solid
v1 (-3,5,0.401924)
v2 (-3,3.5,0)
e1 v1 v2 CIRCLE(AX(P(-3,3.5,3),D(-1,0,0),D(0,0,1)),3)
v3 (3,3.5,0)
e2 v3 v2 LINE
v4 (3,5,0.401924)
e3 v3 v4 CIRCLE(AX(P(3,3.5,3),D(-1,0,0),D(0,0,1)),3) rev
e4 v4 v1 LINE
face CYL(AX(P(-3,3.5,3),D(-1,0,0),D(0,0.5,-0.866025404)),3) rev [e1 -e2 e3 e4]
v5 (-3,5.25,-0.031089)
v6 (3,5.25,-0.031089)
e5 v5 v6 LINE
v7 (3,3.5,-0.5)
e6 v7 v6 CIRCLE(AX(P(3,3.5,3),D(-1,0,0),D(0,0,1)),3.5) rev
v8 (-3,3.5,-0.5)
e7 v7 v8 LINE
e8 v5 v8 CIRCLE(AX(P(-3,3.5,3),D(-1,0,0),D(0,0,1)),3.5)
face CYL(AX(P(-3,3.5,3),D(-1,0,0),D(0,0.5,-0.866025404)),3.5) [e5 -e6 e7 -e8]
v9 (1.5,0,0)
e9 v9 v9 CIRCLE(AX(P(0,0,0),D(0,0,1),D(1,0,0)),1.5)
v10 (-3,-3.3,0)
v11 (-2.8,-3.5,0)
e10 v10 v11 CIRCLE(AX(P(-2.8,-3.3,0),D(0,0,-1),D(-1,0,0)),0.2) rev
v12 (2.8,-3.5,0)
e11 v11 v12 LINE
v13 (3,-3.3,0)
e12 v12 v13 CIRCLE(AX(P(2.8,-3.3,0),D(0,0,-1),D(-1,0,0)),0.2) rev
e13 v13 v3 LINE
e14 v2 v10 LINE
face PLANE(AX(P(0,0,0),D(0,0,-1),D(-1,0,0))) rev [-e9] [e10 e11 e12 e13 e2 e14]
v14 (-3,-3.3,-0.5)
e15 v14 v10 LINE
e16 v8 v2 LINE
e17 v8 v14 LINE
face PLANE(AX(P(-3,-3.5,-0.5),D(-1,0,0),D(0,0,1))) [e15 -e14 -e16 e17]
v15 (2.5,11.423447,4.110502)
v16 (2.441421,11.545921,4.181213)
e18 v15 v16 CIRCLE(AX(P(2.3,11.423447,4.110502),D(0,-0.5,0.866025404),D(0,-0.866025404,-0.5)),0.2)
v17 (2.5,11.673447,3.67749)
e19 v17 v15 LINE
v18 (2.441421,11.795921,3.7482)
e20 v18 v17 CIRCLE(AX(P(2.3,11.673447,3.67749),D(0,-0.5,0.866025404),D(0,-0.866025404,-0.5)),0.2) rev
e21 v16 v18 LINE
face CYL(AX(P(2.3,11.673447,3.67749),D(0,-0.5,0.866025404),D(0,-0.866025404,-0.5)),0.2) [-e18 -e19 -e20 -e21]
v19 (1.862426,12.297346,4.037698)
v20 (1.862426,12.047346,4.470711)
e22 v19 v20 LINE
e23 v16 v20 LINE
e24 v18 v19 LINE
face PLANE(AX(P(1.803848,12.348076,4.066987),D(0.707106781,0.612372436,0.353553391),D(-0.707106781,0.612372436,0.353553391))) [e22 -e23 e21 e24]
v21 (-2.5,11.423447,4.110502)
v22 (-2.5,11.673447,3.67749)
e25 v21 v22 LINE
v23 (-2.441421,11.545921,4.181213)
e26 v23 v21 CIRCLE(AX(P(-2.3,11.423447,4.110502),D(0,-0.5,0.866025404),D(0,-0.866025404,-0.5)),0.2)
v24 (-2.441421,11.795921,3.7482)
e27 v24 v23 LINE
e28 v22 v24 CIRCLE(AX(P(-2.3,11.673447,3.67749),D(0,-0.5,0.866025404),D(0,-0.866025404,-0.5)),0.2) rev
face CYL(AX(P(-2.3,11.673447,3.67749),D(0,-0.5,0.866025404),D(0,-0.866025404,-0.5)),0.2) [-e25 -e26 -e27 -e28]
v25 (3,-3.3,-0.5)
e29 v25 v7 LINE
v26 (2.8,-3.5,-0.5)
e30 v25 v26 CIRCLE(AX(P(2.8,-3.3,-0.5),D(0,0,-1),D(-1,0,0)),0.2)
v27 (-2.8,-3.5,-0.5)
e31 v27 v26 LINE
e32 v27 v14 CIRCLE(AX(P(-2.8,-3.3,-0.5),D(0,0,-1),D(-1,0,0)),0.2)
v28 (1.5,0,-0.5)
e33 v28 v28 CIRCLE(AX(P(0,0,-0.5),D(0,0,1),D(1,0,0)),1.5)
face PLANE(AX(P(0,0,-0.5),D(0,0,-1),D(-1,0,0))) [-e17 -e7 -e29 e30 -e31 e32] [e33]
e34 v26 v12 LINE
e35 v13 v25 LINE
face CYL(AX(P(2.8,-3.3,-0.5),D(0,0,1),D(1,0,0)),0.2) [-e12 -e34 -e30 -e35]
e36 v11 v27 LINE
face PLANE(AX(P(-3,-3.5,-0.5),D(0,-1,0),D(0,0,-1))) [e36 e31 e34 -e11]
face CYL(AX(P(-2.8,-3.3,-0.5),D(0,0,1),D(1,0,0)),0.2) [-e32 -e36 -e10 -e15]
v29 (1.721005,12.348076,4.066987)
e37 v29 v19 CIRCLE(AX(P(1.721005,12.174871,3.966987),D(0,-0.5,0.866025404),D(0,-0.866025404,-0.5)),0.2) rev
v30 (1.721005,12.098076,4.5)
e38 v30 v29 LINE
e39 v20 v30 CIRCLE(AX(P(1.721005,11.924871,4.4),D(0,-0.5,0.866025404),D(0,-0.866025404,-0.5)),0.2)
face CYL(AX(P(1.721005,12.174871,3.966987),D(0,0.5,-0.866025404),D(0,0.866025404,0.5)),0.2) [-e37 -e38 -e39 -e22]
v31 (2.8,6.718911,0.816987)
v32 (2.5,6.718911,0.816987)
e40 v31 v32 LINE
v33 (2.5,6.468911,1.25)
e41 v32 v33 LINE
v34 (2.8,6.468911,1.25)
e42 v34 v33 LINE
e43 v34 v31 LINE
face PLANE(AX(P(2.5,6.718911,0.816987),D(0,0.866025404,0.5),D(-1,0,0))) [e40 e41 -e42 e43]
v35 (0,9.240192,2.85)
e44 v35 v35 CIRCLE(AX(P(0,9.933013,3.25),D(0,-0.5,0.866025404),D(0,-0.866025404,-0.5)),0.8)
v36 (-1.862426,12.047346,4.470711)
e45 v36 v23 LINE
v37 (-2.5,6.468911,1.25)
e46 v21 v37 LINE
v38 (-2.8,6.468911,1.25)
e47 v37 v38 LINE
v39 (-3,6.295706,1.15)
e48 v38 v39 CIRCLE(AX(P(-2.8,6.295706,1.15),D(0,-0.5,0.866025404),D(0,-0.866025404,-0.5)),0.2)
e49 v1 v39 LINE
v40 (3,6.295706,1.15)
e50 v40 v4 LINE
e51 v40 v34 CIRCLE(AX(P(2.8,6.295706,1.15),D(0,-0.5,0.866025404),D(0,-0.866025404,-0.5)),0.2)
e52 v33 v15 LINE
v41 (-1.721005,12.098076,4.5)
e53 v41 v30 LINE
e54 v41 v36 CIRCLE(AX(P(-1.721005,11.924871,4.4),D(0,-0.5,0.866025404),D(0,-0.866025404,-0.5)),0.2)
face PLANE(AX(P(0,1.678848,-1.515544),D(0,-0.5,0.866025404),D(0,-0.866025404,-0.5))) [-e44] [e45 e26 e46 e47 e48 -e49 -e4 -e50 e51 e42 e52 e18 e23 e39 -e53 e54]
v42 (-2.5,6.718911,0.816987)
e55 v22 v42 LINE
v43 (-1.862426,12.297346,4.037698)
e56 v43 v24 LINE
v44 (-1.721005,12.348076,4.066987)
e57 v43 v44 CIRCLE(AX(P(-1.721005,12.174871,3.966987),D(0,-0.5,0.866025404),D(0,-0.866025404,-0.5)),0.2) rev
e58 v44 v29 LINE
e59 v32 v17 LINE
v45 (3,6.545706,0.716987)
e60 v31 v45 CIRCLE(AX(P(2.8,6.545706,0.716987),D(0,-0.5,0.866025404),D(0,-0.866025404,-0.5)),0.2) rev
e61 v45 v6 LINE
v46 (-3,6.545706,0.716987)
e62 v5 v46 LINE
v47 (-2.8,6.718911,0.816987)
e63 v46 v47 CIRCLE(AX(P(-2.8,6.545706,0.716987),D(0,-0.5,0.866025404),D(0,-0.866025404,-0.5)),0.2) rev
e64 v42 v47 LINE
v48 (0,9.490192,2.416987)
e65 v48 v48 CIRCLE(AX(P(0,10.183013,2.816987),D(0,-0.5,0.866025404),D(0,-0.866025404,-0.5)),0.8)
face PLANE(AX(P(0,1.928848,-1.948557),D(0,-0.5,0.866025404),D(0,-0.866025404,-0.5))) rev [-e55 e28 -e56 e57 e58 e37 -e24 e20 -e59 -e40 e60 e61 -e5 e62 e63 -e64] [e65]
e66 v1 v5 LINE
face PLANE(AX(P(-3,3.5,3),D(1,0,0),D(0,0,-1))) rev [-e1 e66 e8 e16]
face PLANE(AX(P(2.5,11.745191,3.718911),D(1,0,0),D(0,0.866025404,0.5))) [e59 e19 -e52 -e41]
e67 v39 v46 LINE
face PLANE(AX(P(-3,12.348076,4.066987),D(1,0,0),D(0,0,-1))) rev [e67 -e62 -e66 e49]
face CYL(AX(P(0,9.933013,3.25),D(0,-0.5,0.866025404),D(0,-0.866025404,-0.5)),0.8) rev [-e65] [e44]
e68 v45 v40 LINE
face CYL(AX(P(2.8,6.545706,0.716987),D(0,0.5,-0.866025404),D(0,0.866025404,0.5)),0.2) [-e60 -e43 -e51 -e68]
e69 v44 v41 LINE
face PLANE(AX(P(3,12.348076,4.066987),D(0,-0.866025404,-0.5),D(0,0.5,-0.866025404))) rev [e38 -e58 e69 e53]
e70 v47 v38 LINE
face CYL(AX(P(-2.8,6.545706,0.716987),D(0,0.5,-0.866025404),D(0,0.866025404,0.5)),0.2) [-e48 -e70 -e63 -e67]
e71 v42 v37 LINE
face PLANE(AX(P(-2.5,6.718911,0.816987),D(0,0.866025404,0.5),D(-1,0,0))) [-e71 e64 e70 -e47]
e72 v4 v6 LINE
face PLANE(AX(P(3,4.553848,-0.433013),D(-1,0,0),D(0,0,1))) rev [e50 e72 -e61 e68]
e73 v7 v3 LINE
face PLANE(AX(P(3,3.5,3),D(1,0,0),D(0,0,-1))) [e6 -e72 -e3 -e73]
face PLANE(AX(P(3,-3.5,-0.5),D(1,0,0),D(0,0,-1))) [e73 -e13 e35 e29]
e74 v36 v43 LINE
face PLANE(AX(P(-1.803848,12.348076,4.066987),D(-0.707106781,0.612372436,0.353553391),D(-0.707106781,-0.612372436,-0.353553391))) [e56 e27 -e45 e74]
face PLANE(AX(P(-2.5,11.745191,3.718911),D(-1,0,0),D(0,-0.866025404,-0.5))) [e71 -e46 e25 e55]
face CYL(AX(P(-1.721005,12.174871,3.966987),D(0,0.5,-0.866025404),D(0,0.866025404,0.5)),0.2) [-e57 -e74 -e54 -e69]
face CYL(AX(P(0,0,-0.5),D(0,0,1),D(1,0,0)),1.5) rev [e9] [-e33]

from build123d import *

# Parameters (mm, degrees)
SKETCH_1_W             = 6
SKETCH_1_H             = 7
SM_BASE_FLANGE_1_DEPTH = 0.5
SM_EDGE_FLANGE_1_DEPTH = 6
SKETCH_11_R            = 1.5
CUT_EXTRUDE_1_DEPTH    = 14.480541017
CUT_EXTRUDE_2_REACH    = 15.287
SKETCH_12_R            = 0.8
OTHER_START            = 2.151923789
OTHER_1_DEPTH          = 0.5
OTHER_START_2          = -0.5
OTHER_1_2_DEPTH        = 0.5


# Read off the part's stored shape, not the designer's step: Затупленный угол1
# Sheet-metal steps are written as plain solids
with BuildPart() as part:
    # Sketch 1 → Базовая кромка1 (new body)
    with BuildSketch(Plane.XY):
        Rectangle(SKETCH_1_W, SKETCH_1_H)
    extrude(amount=-SM_BASE_FLANGE_1_DEPTH)

    # Ребро-кромка1 section (across the edge) → Ребро-кромка1 (add)
    with BuildSketch(Plane(origin=(3, 4.303847577, 0), x_dir=(0, -0.49999999999999495, 0.8660254037844416), z_dir=(-1, 0, 0))):
        with BuildLine():
            Line((-0.5, 0.803847577), (-0.5, 9))
            Line((-0.5, 9), (0, 9))
            Line((0, 9), (0, 0.803847577))
            ThreePointArc((0, 0.803847577), (0.102222521, 0.027390442), (0.401923789, -0.696152423))
            Line((0.401923789, -0.696152423), (-0.031088913, -0.946152423))
            ThreePointArc((-0.031088913, -0.946152423), (-0.380740392, -0.102019081), (-0.5, 0.803847577))
        make_face()
    extrude(amount=SM_EDGE_FLANGE_1_DEPTH)

    # Эскиз11 → Вырез-Вытянуть1 (cut, through all)
    with BuildSketch(Plane.XY):
        Circle(SKETCH_11_R)
    extrude(amount=-CUT_EXTRUDE_1_DEPTH, mode=Mode.SUBTRACT)

    # Эскиз12 → Вырез-Вытянуть2 (cut, up to next)
    with BuildSketch(Plane(origin=(0, 1.075961894, -1.863620668), x_dir=(1, 0, 0), z_dir=(0, -0.4999999999999949, 0.8660254037844416)), mode=Mode.PRIVATE) as cut_extrude_2_sk1:
        with Locations(Location((0, 10.227241336, 0), (0, 0, 270))):
            Circle(SKETCH_12_R)
    cut_extrude_2_tool1 = extrude(cut_extrude_2_sk1.sketch, amount=-CUT_EXTRUDE_2_REACH, mode=Mode.PRIVATE) & part.part
    # Эскиз12 → Вырез-Вытянуть2 (cut, up to next)
    with BuildSketch(Plane(origin=(0, 1.075961894, -1.863620668), x_dir=(1, 0, 0), z_dir=(0, -0.4999999999999949, 0.8660254037844416)), mode=Mode.PRIVATE) as cut_extrude_2_sk2:
        Polygon((-1.803847577, 12.727241336), (-2.5, 12.031088913), (-2.5, 6.227241336), (-3, 6.227241336), (-3, 12.727241336), align=None)
    cut_extrude_2_tool2 = extrude(cut_extrude_2_sk2.sketch, amount=-CUT_EXTRUDE_2_REACH, mode=Mode.PRIVATE) & part.part
    # Эскиз12 → Вырез-Вытянуть2 (cut, up to next)
    with BuildSketch(Plane(origin=(0, 1.075961894, -1.863620668), x_dir=(1, 0, 0), z_dir=(0, -0.4999999999999949, 0.8660254037844416)), mode=Mode.PRIVATE) as cut_extrude_2_sk3:
        Polygon((3, 12.727241336), (1.803847577, 12.727241336), (2.5, 12.031088913), (2.5, 6.227241336), (3, 6.227241336), align=None)
    cut_extrude_2_tool3 = extrude(cut_extrude_2_sk3.sketch, amount=-CUT_EXTRUDE_2_REACH, mode=Mode.PRIVATE) & part.part
    add(cut_extrude_2_tool1.solids().sort_by_distance((0, 9.933013, 3.25))[0], mode=Mode.SUBTRACT)
    add(cut_extrude_2_tool2.solids().sort_by_distance((-2.716553, 9.46484, 2.9797))[0], mode=Mode.SUBTRACT)
    add(cut_extrude_2_tool3.solids().sort_by_distance((2.716553, 9.46484, 2.9797))[0], mode=Mode.SUBTRACT)

    # Other 1 outline → Other 1 (cut)
    with BuildSketch(Plane(origin=(0, 0, 0), x_dir=(1, 0, 0), z_dir=(0, 0.4999999999999948, -0.8660254037844417)).offset(OTHER_START)):
        with BuildLine():
            Line((-3, -6.227241336), (-2.8, -6.227241336))
            ThreePointArc((-2.8, -6.227241336), (-2.941421356, -6.168662692), (-3, -6.027241336))
            Line((-3, -6.027241336), (-3, -6.227241336))
        make_face()
        with BuildLine():
            Line((-2.5, -12.031088913), (-2.441421356, -12.089667557))
            ThreePointArc((-2.441421356, -12.089667557), (-2.484775907, -12.024782888), (-2.5, -11.948246201))
            Line((-2.5, -11.948246201), (-2.5, -12.031088913))
        make_face()
        with BuildLine():
            Line((-1.803847577, -12.727241336), (-1.721004865, -12.727241336))
            ThreePointArc((-1.721004865, -12.727241336), (-1.797541551, -12.712017242), (-1.862426221, -12.668662692))
            Line((-1.862426221, -12.668662692), (-1.803847577, -12.727241336))
        make_face()
        with BuildLine():
            Line((1.803847577, -12.727241336), (1.862426221, -12.668662692))
            ThreePointArc((1.862426221, -12.668662692), (1.797541551, -12.712017242), (1.721004865, -12.727241336))
            Line((1.721004865, -12.727241336), (1.803847577, -12.727241336))
        make_face()
        with BuildLine():
            Line((2.5, -12.031088913), (2.5, -11.948246201))
            ThreePointArc((2.5, -11.948246201), (2.484775907, -12.024782888), (2.441421356, -12.089667557))
            Line((2.441421356, -12.089667557), (2.5, -12.031088913))
        make_face()
        with BuildLine():
            ThreePointArc((3, -6.027241336), (2.941421356, -6.168662692), (2.8, -6.227241336))
            Line((2.8, -6.227241336), (3, -6.227241336))
            Line((3, -6.227241336), (3, -6.027241336))
        make_face()
    extrude(amount=OTHER_1_DEPTH, mode=Mode.SUBTRACT)

    # Other 1 2 outline → Other 1 2 (cut)
    with BuildSketch(Plane.XY.offset(OTHER_START_2)):
        with BuildLine():
            ThreePointArc((3, -3.3), (2.941421356, -3.441421356), (2.8, -3.5))
            Line((2.8, -3.5), (3, -3.5))
            Line((3, -3.5), (3, -3.3))
        make_face()
        with BuildLine():
            ThreePointArc((-2.8, -3.5), (-2.941421356, -3.441421356), (-3, -3.3))
            Line((-3, -3.3), (-3, -3.5))
            Line((-3, -3.5), (-2.8, -3.5))
        make_face()
    extrude(amount=OTHER_1_2_DEPTH, mode=Mode.SUBTRACT)


solid = part.part
